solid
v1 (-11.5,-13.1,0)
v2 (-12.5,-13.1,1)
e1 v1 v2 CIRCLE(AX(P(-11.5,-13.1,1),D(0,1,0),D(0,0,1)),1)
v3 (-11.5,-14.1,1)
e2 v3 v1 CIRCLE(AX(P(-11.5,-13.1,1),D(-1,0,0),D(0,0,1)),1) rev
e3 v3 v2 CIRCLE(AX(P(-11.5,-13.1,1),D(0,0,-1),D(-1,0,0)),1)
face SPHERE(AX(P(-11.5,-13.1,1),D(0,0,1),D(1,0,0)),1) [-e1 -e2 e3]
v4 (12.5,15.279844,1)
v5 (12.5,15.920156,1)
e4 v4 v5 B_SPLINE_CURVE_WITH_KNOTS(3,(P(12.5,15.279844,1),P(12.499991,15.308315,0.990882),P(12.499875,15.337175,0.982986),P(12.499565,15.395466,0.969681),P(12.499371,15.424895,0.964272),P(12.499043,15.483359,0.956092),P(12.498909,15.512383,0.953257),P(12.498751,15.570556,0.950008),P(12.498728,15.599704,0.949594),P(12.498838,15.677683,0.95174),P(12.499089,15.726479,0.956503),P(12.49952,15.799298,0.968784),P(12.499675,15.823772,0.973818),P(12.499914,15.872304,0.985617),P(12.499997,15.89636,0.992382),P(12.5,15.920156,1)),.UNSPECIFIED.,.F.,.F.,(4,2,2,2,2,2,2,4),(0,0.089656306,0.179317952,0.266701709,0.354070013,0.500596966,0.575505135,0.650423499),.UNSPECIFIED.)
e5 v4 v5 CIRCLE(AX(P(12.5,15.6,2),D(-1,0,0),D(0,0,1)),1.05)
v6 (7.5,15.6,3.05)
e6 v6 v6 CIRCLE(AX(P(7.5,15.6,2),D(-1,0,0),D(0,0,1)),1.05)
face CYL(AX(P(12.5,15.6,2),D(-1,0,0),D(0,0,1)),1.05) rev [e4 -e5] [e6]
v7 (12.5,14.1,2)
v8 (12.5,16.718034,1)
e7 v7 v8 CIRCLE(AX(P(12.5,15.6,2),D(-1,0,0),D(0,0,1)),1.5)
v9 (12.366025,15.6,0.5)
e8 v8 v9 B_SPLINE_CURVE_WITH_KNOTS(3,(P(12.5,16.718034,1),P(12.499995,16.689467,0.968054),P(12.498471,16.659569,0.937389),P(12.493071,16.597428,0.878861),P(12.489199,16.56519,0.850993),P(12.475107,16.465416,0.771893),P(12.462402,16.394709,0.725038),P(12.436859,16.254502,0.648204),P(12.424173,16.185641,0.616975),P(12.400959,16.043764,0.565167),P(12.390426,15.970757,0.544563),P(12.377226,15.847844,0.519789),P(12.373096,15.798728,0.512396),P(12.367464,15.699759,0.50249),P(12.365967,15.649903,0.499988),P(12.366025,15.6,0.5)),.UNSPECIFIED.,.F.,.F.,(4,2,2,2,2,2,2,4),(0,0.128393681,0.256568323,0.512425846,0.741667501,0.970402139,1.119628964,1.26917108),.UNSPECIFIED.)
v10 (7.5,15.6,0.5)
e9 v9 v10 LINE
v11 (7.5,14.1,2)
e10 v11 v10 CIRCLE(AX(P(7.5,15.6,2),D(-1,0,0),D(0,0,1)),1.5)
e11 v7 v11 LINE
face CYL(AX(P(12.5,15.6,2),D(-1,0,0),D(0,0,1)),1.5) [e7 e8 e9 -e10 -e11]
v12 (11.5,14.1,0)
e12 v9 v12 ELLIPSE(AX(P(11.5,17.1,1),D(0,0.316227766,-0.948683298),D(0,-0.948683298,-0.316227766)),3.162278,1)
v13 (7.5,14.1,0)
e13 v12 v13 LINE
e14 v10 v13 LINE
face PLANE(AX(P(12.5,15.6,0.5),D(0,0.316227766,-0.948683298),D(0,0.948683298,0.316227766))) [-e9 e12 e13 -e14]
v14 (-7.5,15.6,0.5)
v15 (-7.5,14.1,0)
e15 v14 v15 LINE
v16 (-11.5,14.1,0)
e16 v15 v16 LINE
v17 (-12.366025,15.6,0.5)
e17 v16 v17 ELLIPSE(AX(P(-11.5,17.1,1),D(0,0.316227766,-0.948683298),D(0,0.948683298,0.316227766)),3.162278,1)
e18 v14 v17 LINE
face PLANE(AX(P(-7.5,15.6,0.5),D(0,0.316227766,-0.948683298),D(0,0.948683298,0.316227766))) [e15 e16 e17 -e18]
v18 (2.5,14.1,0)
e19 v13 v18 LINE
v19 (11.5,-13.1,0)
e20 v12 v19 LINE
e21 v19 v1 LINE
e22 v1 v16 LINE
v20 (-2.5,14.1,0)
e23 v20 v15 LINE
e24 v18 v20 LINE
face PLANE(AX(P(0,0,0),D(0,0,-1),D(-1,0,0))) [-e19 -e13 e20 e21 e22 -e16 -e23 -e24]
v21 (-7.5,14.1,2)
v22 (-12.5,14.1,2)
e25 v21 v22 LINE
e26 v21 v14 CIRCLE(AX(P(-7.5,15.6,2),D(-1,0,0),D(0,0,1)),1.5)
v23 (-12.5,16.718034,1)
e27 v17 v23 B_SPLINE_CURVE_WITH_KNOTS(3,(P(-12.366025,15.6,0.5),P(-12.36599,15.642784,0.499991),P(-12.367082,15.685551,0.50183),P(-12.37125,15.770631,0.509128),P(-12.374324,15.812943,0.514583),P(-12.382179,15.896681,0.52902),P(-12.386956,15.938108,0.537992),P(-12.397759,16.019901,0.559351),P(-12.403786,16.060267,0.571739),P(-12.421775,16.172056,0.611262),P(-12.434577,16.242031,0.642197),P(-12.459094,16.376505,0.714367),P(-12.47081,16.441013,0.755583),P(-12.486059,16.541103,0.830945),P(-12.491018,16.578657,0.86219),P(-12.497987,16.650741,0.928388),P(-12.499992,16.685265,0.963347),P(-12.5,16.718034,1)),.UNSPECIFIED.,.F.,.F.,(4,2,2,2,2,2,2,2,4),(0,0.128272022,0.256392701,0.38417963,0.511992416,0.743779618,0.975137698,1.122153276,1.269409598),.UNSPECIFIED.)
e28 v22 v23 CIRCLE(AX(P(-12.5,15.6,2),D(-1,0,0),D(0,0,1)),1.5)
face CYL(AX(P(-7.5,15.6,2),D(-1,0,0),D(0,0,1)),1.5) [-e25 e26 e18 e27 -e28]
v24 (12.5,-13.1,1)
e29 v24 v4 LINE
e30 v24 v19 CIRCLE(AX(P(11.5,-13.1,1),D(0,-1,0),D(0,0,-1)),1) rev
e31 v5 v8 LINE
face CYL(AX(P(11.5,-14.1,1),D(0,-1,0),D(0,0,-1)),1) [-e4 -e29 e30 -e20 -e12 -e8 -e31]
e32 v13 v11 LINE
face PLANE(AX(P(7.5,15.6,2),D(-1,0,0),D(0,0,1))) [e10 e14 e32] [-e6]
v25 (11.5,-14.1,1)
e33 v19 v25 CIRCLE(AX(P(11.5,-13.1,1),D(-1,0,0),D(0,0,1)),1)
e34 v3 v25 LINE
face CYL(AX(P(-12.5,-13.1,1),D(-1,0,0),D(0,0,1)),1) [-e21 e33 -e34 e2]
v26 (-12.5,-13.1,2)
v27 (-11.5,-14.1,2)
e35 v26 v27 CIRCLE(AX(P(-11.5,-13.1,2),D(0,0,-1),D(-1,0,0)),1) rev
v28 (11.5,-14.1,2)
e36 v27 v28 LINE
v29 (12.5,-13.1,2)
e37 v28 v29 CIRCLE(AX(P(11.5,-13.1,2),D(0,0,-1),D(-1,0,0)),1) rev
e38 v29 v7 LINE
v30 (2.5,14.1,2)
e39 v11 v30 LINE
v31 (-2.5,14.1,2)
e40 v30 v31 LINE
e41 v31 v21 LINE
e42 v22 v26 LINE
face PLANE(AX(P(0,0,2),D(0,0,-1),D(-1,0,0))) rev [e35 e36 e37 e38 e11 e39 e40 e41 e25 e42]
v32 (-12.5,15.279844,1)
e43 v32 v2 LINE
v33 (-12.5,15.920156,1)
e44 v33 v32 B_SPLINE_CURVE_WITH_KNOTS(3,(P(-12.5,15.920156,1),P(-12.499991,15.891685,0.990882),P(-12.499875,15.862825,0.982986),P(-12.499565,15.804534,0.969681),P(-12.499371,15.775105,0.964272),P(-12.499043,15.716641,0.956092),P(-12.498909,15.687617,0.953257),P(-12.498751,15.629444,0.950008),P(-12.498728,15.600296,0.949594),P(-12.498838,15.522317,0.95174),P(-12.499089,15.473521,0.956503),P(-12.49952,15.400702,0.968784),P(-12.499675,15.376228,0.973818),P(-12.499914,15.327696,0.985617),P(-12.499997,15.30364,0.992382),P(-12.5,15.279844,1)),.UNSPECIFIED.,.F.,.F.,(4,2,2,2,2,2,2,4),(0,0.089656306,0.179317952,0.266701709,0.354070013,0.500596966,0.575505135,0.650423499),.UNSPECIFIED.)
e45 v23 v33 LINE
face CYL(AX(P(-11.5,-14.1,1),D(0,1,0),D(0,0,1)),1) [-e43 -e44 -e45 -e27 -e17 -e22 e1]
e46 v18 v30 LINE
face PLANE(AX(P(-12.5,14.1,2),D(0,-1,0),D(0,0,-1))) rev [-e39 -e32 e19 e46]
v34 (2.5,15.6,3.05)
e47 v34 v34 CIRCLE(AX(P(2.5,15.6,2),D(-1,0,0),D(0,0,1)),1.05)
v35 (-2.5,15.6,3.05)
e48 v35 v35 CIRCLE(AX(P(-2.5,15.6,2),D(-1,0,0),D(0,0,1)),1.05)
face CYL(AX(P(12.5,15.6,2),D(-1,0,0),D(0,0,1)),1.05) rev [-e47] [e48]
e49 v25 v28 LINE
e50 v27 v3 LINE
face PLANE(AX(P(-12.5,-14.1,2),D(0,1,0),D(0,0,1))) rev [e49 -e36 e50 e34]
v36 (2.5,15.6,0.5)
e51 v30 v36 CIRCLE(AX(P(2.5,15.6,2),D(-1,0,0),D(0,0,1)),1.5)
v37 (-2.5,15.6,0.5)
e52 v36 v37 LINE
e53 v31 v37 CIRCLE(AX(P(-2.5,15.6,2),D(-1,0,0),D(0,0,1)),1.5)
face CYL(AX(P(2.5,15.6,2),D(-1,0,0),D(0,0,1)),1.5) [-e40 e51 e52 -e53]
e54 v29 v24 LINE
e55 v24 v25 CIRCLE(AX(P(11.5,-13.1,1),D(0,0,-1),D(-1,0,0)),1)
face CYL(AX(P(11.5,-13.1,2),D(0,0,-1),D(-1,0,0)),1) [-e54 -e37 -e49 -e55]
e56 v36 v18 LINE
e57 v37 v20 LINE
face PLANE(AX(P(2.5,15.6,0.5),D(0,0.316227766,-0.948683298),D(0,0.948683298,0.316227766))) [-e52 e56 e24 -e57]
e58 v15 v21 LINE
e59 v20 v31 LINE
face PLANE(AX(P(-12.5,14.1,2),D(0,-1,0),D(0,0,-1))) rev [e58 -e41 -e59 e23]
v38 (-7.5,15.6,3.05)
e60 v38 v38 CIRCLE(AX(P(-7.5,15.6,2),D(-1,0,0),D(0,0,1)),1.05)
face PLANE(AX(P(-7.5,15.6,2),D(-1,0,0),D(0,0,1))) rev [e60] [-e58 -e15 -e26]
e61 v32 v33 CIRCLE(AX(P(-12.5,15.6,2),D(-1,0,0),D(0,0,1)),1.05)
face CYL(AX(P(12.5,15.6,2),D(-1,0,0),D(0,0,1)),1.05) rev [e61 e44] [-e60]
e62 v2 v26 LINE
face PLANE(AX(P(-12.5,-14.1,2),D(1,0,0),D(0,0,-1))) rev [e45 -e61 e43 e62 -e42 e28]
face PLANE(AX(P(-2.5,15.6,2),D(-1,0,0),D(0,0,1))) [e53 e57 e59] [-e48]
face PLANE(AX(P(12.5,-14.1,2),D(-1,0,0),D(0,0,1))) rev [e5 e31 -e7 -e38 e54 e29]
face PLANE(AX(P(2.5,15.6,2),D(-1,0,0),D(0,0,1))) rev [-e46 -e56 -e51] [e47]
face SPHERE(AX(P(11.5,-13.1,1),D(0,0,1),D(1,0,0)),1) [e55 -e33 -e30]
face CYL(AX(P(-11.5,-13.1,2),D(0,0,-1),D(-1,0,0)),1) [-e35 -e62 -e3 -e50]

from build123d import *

# Parameters (mm, degrees)
SKETCH1_W           = 25
SKETCH1_H           = 28.2
BOSS_EXTRUDE1_DEPTH = 2
BOSS_EXTRUDE2_DEPTH = 5
LPATTERN1_COUNT     = 3
LPATTERN1_PITCH     = 10
SKETCH6_R           = 1.050000034
CUT_EXTRUDE1_DEPTH  = 31.490326335
FILLET1_R           = 1
FILLET2_R           = 1


with BuildPart() as part:
    # Sketch1 → Boss-Extrude1 (new body)
    with BuildSketch(Plane.XY):
        Rectangle(SKETCH1_W, SKETCH1_H)
    extrude(amount=BOSS_EXTRUDE1_DEPTH)

    # Sketch5 → Boss-Extrude2 (add)
    with BuildSketch(Plane.ZY.offset(12.5)):
        with BuildLine():
            Line((0.5, 15.6), (0, 14.1))
            Line((0, 14.1), (2, 14.1))
            ThreePointArc((2, 14.1), (3.060660172, 16.660660172), (0.5, 15.6))
        make_face()
    boss_extrude2 = extrude(amount=-BOSS_EXTRUDE2_DEPTH)

    # LPattern1: Boss-Extrude2 ×3
    with Locations(*[(i * LPATTERN1_PITCH, 0, 0) for i in range(1, LPATTERN1_COUNT)]):
        add(boss_extrude2)

    # Sketch6 → Cut-Extrude1 (cut, through all)
    with BuildSketch(Plane.ZY.offset(12.5)):
        with Locations((2, 15.6)):
            Circle(SKETCH6_R)
    extrude(amount=-CUT_EXTRUDE1_DEPTH, mode=Mode.SUBTRACT)

    # Fillet1
    # the kernel refuses this fillet: 1 mm, written as the material it takes off along each edge
    with BuildSketch(Plane(origin=(12.5, -20.1, 0), x_dir=(0, 0, 1), z_dir=(0, 1, 0)), Plane(origin=(-12.5, 20.1, 0), x_dir=(0, 0, 1), z_dir=(0, -1, 0))) as fillet1_piece_1:
        with BuildLine():
            CenterArc((FILLET1_R, -FILLET1_R), FILLET1_R, 90, 90)
            Line((0, -FILLET1_R), (-FILLET1_R * 0.02, -FILLET1_R))
            Line((-FILLET1_R * 0.02, -FILLET1_R), (-FILLET1_R * 0.02, FILLET1_R * 0.02))
            Line((-FILLET1_R * 0.02, FILLET1_R * 0.02), (FILLET1_R, FILLET1_R * 0.02))
            Line((FILLET1_R, FILLET1_R * 0.02), (FILLET1_R, 0))
        make_face()
    extrude(amount=40.2, mode=Mode.SUBTRACT)
    with BuildSketch(Plane(origin=(-18.5, -14.1, 0), x_dir=(0, 0, 1), z_dir=(1, 0, 0))) as fillet1_piece_2:
        with BuildLine():
            CenterArc((FILLET1_R, -FILLET1_R), FILLET1_R, 90, 90)
            Line((0, -FILLET1_R), (-FILLET1_R * 0.02, -FILLET1_R))
            Line((-FILLET1_R * 0.02, -FILLET1_R), (-FILLET1_R * 0.02, FILLET1_R * 0.02))
            Line((-FILLET1_R * 0.02, FILLET1_R * 0.02), (FILLET1_R, FILLET1_R * 0.02))
            Line((FILLET1_R, FILLET1_R * 0.02), (FILLET1_R, 0))
        make_face()
    extrude(amount=37, mode=Mode.SUBTRACT)

    # Fillet2
    # the kernel refuses this fillet: 1 mm, written as the material it takes off along each edge
    with BuildSketch(Plane(origin=(-11.5, -13.1, 1), x_dir=(-1, 0, 0), z_dir=(0, -1, 0))) as fillet2_piece_1_section:
        Polygon((0, 0), (FILLET2_R, 0), (FILLET2_R, FILLET2_R), (0, FILLET2_R), align=None)
    fillet2_piece_1 = extrude(amount=FILLET2_R, mode=Mode.PRIVATE)
    fillet2_piece_1 = fillet2_piece_1 - Plane(origin=(-11.5, -13.1, 1), x_dir=(0.7071067811865475, 0, 0.7071067811865475), z_dir=(0, -1, 0)) * Sphere(FILLET2_R, mode=Mode.PRIVATE)
    add(fillet2_piece_1, mode=Mode.SUBTRACT)
    with BuildSketch(Plane(origin=(11.5, -13.1, 1), x_dir=(1, 0, 0), z_dir=(0, -1, 0))) as fillet2_piece_2_section:
        Polygon((0, 0), (FILLET2_R, 0), (FILLET2_R, -FILLET2_R), (0, -FILLET2_R), align=None)
    fillet2_piece_2 = extrude(amount=FILLET2_R, mode=Mode.PRIVATE)
    fillet2_piece_2 = fillet2_piece_2 - Plane(origin=(11.5, -13.1, 1), x_dir=(-0.7071067811865475, 0, 0.7071067811865475), z_dir=(0, -1, 0)) * Sphere(FILLET2_R, mode=Mode.PRIVATE)
    add(fillet2_piece_2, mode=Mode.SUBTRACT)
    with BuildSketch(Plane(origin=(12.5, -14.1, 1), x_dir=(-1, 0, 0), z_dir=(0, 0, 1))) as fillet2_piece_3:
        with BuildLine():
            CenterArc((FILLET2_R, -FILLET2_R), FILLET2_R, 90, 90)
            Line((0, -FILLET2_R), (0, 0))
            Line((0, 0), (FILLET2_R, 0))
        make_face()
    extrude(amount=3.5, mode=Mode.SUBTRACT)
    with BuildSketch(Plane(origin=(-12.5, -14.1, 1), x_dir=(1, 0, 0), z_dir=(0, 0, 1))) as fillet2_piece_4:
        with BuildLine():
            CenterArc((FILLET2_R, FILLET2_R), FILLET2_R, 180, 90)
            Line((0, FILLET2_R), (0, 0))
            Line((0, 0), (FILLET2_R, 0))
        make_face()
    extrude(amount=3.5, mode=Mode.SUBTRACT)


solid = part.part
